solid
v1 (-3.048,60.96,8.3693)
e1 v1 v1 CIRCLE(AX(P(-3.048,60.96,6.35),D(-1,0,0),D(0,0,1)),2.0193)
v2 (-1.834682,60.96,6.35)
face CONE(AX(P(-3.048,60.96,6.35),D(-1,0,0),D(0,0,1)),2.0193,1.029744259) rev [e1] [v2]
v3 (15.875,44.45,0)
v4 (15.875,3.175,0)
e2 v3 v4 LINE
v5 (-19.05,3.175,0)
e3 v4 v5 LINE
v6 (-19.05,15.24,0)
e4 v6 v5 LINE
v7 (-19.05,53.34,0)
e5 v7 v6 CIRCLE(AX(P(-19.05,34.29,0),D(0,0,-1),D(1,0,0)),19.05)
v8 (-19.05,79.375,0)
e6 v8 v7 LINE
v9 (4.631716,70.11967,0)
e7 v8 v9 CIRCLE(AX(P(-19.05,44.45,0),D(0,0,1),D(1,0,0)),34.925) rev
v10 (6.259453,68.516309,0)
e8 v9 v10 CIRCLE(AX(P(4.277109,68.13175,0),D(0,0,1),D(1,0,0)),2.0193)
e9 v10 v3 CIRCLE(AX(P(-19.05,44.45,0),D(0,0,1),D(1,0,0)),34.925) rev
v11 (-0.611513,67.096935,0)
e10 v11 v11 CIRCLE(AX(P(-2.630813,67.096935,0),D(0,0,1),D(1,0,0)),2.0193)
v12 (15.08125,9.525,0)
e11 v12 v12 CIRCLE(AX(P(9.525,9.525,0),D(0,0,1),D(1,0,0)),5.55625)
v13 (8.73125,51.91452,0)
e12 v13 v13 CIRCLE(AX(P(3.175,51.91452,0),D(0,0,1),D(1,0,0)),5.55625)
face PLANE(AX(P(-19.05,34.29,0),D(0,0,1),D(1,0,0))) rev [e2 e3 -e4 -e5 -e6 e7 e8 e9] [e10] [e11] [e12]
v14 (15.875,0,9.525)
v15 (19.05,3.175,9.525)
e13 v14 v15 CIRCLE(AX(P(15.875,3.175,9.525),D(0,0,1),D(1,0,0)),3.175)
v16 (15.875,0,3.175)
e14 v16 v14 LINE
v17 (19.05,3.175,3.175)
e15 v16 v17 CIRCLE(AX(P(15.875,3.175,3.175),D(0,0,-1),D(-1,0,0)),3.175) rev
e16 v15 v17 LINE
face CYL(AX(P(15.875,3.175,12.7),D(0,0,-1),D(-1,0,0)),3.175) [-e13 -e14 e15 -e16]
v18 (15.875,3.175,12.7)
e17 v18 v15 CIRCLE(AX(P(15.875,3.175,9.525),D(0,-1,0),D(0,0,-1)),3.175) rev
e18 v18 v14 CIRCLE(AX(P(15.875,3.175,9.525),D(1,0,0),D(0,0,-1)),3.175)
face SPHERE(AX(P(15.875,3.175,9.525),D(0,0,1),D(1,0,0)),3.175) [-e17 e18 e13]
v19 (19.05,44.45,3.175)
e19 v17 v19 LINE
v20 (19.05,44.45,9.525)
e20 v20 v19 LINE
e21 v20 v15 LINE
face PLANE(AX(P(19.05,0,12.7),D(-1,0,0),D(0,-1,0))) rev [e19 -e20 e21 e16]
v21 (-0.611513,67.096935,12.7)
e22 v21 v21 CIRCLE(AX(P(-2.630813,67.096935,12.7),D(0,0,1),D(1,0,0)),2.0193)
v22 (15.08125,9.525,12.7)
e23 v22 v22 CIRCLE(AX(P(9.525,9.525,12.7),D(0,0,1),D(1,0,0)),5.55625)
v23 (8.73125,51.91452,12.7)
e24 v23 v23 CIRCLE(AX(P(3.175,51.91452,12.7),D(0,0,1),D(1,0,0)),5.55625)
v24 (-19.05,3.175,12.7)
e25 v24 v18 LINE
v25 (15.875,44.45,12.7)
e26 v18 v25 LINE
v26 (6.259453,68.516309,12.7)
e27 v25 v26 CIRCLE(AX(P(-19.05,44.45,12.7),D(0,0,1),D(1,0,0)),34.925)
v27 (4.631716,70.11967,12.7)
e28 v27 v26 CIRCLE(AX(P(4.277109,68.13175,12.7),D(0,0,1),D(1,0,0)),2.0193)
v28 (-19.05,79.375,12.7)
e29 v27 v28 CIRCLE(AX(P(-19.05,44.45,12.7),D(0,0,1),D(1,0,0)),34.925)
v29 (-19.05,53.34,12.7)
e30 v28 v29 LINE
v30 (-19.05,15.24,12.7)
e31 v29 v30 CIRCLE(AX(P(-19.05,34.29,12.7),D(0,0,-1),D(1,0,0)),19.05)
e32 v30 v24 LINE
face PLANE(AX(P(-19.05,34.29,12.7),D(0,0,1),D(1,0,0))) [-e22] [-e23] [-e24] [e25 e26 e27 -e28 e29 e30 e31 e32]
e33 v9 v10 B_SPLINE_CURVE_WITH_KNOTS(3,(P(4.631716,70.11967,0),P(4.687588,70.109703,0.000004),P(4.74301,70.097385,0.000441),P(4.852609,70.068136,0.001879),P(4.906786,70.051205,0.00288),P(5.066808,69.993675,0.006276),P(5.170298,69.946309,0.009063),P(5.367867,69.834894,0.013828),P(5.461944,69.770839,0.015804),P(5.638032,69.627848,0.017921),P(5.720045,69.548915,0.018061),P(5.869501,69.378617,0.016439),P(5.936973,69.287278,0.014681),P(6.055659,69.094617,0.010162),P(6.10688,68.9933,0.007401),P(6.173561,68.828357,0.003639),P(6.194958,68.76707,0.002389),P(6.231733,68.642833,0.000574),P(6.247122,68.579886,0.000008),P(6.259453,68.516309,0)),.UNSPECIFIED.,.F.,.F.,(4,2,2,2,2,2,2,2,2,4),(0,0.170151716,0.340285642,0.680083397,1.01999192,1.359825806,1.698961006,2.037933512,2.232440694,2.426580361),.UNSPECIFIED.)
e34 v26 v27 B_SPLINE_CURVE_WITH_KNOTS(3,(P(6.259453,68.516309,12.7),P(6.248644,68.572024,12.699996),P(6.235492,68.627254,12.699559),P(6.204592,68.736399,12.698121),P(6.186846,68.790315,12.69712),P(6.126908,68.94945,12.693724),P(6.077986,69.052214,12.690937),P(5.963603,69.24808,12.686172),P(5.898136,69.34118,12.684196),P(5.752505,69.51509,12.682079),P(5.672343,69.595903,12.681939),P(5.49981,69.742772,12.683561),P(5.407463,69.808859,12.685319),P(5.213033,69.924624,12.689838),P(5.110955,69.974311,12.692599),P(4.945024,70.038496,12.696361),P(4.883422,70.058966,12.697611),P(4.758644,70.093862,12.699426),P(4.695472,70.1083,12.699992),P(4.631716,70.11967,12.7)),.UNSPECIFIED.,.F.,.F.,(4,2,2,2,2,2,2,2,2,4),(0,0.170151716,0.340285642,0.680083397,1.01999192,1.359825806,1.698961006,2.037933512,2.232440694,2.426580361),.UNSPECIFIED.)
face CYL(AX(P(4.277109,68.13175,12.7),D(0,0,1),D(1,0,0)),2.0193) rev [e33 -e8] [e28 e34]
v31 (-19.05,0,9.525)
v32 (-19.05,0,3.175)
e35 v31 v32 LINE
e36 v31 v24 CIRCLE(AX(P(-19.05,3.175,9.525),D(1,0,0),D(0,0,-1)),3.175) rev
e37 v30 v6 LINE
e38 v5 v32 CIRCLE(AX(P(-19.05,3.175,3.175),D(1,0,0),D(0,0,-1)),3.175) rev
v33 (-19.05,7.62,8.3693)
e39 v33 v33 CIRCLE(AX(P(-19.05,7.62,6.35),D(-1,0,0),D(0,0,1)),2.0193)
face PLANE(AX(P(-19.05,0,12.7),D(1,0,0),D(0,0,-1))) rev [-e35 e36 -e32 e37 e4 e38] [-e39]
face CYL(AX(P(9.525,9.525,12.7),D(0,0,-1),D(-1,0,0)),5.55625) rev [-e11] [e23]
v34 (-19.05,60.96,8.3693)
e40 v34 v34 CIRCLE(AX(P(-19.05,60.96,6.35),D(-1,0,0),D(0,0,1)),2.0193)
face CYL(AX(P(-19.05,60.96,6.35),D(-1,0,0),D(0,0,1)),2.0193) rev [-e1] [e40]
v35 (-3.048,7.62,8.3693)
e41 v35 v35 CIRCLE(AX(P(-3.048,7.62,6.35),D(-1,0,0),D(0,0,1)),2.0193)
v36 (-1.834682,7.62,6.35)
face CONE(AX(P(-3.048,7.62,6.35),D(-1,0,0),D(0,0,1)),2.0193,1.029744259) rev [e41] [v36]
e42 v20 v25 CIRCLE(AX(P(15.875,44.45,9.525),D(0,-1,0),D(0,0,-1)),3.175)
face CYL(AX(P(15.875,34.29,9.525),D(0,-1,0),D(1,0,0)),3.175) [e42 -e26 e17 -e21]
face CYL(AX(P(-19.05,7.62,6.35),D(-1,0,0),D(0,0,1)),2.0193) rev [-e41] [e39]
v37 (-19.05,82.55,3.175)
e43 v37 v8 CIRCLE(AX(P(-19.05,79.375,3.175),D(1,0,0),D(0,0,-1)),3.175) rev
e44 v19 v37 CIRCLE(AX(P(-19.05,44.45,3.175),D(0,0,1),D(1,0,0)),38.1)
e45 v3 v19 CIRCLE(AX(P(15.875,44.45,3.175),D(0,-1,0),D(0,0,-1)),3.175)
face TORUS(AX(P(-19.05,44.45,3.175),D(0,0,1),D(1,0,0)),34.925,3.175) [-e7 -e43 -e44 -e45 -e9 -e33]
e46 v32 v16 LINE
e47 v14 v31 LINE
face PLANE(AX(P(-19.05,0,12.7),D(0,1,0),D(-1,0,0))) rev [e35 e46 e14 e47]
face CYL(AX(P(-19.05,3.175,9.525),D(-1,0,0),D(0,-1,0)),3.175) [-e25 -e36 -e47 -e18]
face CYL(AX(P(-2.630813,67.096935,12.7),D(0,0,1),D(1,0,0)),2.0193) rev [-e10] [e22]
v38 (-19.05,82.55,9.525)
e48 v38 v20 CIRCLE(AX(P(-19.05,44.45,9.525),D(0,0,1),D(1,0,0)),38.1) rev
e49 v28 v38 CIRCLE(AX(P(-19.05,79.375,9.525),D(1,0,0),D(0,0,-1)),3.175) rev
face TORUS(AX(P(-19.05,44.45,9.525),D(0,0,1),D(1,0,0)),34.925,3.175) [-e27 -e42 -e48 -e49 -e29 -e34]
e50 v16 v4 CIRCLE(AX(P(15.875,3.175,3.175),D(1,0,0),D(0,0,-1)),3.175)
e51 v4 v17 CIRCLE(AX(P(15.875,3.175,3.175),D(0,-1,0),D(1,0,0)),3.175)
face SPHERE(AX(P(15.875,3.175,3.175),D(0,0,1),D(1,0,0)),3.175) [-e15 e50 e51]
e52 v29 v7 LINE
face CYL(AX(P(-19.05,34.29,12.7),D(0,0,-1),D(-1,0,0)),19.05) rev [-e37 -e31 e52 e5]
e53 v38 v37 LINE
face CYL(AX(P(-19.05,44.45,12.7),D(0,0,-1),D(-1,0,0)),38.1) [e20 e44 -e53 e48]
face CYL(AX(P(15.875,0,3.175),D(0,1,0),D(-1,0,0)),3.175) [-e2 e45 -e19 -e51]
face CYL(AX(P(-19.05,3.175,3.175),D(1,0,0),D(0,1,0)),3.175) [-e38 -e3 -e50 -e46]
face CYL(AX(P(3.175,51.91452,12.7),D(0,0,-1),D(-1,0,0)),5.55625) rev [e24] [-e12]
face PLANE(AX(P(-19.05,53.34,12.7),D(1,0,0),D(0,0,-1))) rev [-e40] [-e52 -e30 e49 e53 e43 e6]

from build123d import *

# Parameters (mm, degrees)
SKETCH1_R                  = 5.55625
BOSS_EXTRUDE1_DEPTH        = 12.7
F_10_32_TAPPED_HOLE2_D     = 4.0386
F_10_32_TAPPED_HOLE3_D     = 4.0386
F_10_32_TAPPED_HOLE3_DEPTH = 16.002
F_10_32_TAPPED_HOLE3_TIP   = 1.213317848
FILLET1_R                  = 3.175


with BuildPart() as part:
    # Sketch1 → Boss-Extrude1 (new body)
    with BuildSketch(Plane.XY):
        with BuildLine():
            Line((-19.05, 0), (19.05, 0))
            Line((19.05, 0), (19.05, 44.45))
            ThreePointArc((19.05, 44.45), (7.890768363, 71.390768363), (-19.05, 82.55))
            Line((-19.05, 82.55), (-19.05, 53.34))
            ThreePointArc((-19.05, 53.34), (0, 34.29), (-19.05, 15.24))
            Line((-19.05, 15.24), (-19.05, 0))
        make_face()
        with Locations((9.525, 9.525)):
            Circle(SKETCH1_R, mode=Mode.SUBTRACT)
        with Locations((3.175, 51.914520005)):
            Circle(SKETCH1_R, mode=Mode.SUBTRACT)
    extrude(amount=BOSS_EXTRUDE1_DEPTH)

    # #10-32 Tapped Hole2 (through all)
    with Locations(Plane.XY.offset(12.7)):
        with Locations((-2.630812741, 67.096934822), (4.277109037, 68.131749636)):
            Hole(F_10_32_TAPPED_HOLE2_D / 2)

    # #10-32 Tapped Hole3
    with Locations(Plane.ZY.offset(19.05)):
        with Locations((6.35, 7.62), (6.35, 60.96)):
            Hole(F_10_32_TAPPED_HOLE3_D / 2, depth=F_10_32_TAPPED_HOLE3_DEPTH)
            with Locations((0, 0, -(F_10_32_TAPPED_HOLE3_DEPTH + F_10_32_TAPPED_HOLE3_TIP / 2))):  # 118° drill point
                Cone(0, F_10_32_TAPPED_HOLE3_D / 2, F_10_32_TAPPED_HOLE3_TIP, mode=Mode.SUBTRACT)

    # Fillet1
    # the kernel refuses this fillet: 3.175 mm, written as the material it takes off along each edge
    with BuildSketch(Plane(origin=(15.875, 3.175, 9.525), x_dir=(0, -1, 0), z_dir=(0, 0, 1))) as fillet1_piece_1_section:
        Polygon((0, 0), (FILLET1_R * 1.02, 0), (FILLET1_R * 1.02, FILLET1_R * 1.02), (0, FILLET1_R * 1.02), align=None)
    fillet1_piece_1 = extrude(amount=FILLET1_R * 1.02, mode=Mode.PRIVATE)
    fillet1_piece_1 = fillet1_piece_1 - Plane(origin=(15.875, 3.175, 9.525), x_dir=(-0.7071067811865476, 0.7071067811865475, 0), z_dir=(0, 0, 1)) * Sphere(FILLET1_R, mode=Mode.PRIVATE)
    add(fillet1_piece_1, mode=Mode.SUBTRACT)
    with BuildSketch(Plane(origin=(15.875, 3.175, 3.175), x_dir=(0, -1, 0), z_dir=(0, 0, -1))) as fillet1_piece_2_section:
        Polygon((0, 0), (FILLET1_R * 1.02, 0), (FILLET1_R * 1.02, -FILLET1_R * 1.02), (0, -FILLET1_R * 1.02), align=None)
    fillet1_piece_2 = extrude(amount=FILLET1_R * 1.02, mode=Mode.PRIVATE)
    fillet1_piece_2 = fillet1_piece_2 - Plane(origin=(15.875, 3.175, 3.175), x_dir=(-0.7071067811865476, 0.7071067811865475, 0), z_dir=(0, 0, -1)) * Sphere(FILLET1_R, mode=Mode.PRIVATE)
    add(fillet1_piece_2, mode=Mode.SUBTRACT)
    with BuildSketch(Plane(origin=(19.05, 3.175, 12.7), x_dir=(-1, 0, 0), z_dir=(0, 1, 0))) as fillet1_piece_3:
        with BuildLine():
            CenterArc((FILLET1_R, -FILLET1_R), FILLET1_R, 90, 90)
            Line((0, -FILLET1_R), (-FILLET1_R * 0.02, -FILLET1_R))
            Line((-FILLET1_R * 0.02, -FILLET1_R), (-FILLET1_R * 0.02, FILLET1_R * 0.02))
            Line((-FILLET1_R * 0.02, FILLET1_R * 0.02), (FILLET1_R, FILLET1_R * 0.02))
            Line((FILLET1_R, FILLET1_R * 0.02), (FILLET1_R, 0))
        make_face()
    extrude(amount=41.275, mode=Mode.SUBTRACT)
    with BuildSketch(Plane(origin=(19.05, 0, 3.175), x_dir=(-1, 0, 0), z_dir=(0, 0, 1))) as fillet1_piece_4:
        with BuildLine():
            CenterArc((FILLET1_R, -FILLET1_R), FILLET1_R, 90, 90)
            Line((0, -FILLET1_R), (-FILLET1_R * 0.02, -FILLET1_R))
            Line((-FILLET1_R * 0.02, -FILLET1_R), (-FILLET1_R * 0.02, FILLET1_R * 0.02))
            Line((-FILLET1_R * 0.02, FILLET1_R * 0.02), (FILLET1_R, FILLET1_R * 0.02))
            Line((FILLET1_R, FILLET1_R * 0.02), (FILLET1_R, 0))
        make_face()
    extrude(amount=6.35, mode=Mode.SUBTRACT)
    with BuildSketch(Plane(origin=(-19.05, 44.45, 12.7), x_dir=(1, 0, 0), z_dir=(0, -1, 0))) as fillet1_piece_5:
        with BuildLine():
            CenterArc((38.1 - FILLET1_R, -FILLET1_R), FILLET1_R, 0, 90)
            Line((38.1, -FILLET1_R), (38.1 + FILLET1_R * 0.02, -FILLET1_R))
            Line((38.1 + FILLET1_R * 0.02, -FILLET1_R), (38.1 + FILLET1_R * 0.02, FILLET1_R * 0.02))
            Line((38.1 + FILLET1_R * 0.02, FILLET1_R * 0.02), (38.1 - FILLET1_R, FILLET1_R * 0.02))
            Line((38.1 - FILLET1_R, FILLET1_R * 0.02), (38.1 - FILLET1_R, 0))
        make_face()
    revolve(axis=Axis((-19.05, 44.45, 12.7), (0, 0, 1)), revolution_arc=90, mode=Mode.SUBTRACT)
    with BuildSketch(Plane(origin=(-19.05, 44.45, 0), x_dir=(1, 0, 0), z_dir=(0, -1, 0))) as fillet1_piece_6:
        with BuildLine():
            CenterArc((38.1 - FILLET1_R, FILLET1_R), FILLET1_R, 270, 90)
            Line((38.1, FILLET1_R), (38.1 + FILLET1_R * 0.02, FILLET1_R))
            Line((38.1 + FILLET1_R * 0.02, FILLET1_R), (38.1 + FILLET1_R * 0.02, -FILLET1_R * 0.02))
            Line((38.1 + FILLET1_R * 0.02, -FILLET1_R * 0.02), (38.1 - FILLET1_R, -FILLET1_R * 0.02))
            Line((38.1 - FILLET1_R, -FILLET1_R * 0.02), (38.1 - FILLET1_R, 0))
        make_face()
    revolve(axis=Axis((-19.05, 44.45, 0), (0, 0, 1)), revolution_arc=90, mode=Mode.SUBTRACT)
    with BuildSketch(Plane(origin=(-19.05, 0, 12.7), x_dir=(0, 1, 0), z_dir=(1, 0, 0))) as fillet1_piece_7:
        with BuildLine():
            CenterArc((FILLET1_R, -FILLET1_R), FILLET1_R, 90, 90)
            Line((0, -FILLET1_R), (-FILLET1_R * 0.02, -FILLET1_R))
            Line((-FILLET1_R * 0.02, -FILLET1_R), (-FILLET1_R * 0.02, FILLET1_R * 0.02))
            Line((-FILLET1_R * 0.02, FILLET1_R * 0.02), (FILLET1_R, FILLET1_R * 0.02))
            Line((FILLET1_R, FILLET1_R * 0.02), (FILLET1_R, 0))
        make_face()
    extrude(amount=34.925, mode=Mode.SUBTRACT)
    with BuildSketch(Plane(origin=(19.05, 3.175, 0), x_dir=(-1, 0, 0), z_dir=(0, 1, 0))) as fillet1_piece_8:
        with BuildLine():
            CenterArc((FILLET1_R, FILLET1_R), FILLET1_R, 180, 90)
            Line((0, FILLET1_R), (-FILLET1_R * 0.02, FILLET1_R))
            Line((-FILLET1_R * 0.02, FILLET1_R), (-FILLET1_R * 0.02, -FILLET1_R * 0.02))
            Line((-FILLET1_R * 0.02, -FILLET1_R * 0.02), (FILLET1_R, -FILLET1_R * 0.02))
            Line((FILLET1_R, -FILLET1_R * 0.02), (FILLET1_R, 0))
        make_face()
    extrude(amount=41.275, mode=Mode.SUBTRACT)
    with BuildSketch(Plane(origin=(-19.05, 0, 0), x_dir=(0, 1, 0), z_dir=(1, 0, 0))) as fillet1_piece_9:
        with BuildLine():
            CenterArc((FILLET1_R, FILLET1_R), FILLET1_R, 180, 90)
            Line((0, FILLET1_R), (-FILLET1_R * 0.02, FILLET1_R))
            Line((-FILLET1_R * 0.02, FILLET1_R), (-FILLET1_R * 0.02, -FILLET1_R * 0.02))
            Line((-FILLET1_R * 0.02, -FILLET1_R * 0.02), (FILLET1_R, -FILLET1_R * 0.02))
            Line((FILLET1_R, -FILLET1_R * 0.02), (FILLET1_R, 0))
        make_face()
    extrude(amount=34.925, mode=Mode.SUBTRACT)


solid = part.part
